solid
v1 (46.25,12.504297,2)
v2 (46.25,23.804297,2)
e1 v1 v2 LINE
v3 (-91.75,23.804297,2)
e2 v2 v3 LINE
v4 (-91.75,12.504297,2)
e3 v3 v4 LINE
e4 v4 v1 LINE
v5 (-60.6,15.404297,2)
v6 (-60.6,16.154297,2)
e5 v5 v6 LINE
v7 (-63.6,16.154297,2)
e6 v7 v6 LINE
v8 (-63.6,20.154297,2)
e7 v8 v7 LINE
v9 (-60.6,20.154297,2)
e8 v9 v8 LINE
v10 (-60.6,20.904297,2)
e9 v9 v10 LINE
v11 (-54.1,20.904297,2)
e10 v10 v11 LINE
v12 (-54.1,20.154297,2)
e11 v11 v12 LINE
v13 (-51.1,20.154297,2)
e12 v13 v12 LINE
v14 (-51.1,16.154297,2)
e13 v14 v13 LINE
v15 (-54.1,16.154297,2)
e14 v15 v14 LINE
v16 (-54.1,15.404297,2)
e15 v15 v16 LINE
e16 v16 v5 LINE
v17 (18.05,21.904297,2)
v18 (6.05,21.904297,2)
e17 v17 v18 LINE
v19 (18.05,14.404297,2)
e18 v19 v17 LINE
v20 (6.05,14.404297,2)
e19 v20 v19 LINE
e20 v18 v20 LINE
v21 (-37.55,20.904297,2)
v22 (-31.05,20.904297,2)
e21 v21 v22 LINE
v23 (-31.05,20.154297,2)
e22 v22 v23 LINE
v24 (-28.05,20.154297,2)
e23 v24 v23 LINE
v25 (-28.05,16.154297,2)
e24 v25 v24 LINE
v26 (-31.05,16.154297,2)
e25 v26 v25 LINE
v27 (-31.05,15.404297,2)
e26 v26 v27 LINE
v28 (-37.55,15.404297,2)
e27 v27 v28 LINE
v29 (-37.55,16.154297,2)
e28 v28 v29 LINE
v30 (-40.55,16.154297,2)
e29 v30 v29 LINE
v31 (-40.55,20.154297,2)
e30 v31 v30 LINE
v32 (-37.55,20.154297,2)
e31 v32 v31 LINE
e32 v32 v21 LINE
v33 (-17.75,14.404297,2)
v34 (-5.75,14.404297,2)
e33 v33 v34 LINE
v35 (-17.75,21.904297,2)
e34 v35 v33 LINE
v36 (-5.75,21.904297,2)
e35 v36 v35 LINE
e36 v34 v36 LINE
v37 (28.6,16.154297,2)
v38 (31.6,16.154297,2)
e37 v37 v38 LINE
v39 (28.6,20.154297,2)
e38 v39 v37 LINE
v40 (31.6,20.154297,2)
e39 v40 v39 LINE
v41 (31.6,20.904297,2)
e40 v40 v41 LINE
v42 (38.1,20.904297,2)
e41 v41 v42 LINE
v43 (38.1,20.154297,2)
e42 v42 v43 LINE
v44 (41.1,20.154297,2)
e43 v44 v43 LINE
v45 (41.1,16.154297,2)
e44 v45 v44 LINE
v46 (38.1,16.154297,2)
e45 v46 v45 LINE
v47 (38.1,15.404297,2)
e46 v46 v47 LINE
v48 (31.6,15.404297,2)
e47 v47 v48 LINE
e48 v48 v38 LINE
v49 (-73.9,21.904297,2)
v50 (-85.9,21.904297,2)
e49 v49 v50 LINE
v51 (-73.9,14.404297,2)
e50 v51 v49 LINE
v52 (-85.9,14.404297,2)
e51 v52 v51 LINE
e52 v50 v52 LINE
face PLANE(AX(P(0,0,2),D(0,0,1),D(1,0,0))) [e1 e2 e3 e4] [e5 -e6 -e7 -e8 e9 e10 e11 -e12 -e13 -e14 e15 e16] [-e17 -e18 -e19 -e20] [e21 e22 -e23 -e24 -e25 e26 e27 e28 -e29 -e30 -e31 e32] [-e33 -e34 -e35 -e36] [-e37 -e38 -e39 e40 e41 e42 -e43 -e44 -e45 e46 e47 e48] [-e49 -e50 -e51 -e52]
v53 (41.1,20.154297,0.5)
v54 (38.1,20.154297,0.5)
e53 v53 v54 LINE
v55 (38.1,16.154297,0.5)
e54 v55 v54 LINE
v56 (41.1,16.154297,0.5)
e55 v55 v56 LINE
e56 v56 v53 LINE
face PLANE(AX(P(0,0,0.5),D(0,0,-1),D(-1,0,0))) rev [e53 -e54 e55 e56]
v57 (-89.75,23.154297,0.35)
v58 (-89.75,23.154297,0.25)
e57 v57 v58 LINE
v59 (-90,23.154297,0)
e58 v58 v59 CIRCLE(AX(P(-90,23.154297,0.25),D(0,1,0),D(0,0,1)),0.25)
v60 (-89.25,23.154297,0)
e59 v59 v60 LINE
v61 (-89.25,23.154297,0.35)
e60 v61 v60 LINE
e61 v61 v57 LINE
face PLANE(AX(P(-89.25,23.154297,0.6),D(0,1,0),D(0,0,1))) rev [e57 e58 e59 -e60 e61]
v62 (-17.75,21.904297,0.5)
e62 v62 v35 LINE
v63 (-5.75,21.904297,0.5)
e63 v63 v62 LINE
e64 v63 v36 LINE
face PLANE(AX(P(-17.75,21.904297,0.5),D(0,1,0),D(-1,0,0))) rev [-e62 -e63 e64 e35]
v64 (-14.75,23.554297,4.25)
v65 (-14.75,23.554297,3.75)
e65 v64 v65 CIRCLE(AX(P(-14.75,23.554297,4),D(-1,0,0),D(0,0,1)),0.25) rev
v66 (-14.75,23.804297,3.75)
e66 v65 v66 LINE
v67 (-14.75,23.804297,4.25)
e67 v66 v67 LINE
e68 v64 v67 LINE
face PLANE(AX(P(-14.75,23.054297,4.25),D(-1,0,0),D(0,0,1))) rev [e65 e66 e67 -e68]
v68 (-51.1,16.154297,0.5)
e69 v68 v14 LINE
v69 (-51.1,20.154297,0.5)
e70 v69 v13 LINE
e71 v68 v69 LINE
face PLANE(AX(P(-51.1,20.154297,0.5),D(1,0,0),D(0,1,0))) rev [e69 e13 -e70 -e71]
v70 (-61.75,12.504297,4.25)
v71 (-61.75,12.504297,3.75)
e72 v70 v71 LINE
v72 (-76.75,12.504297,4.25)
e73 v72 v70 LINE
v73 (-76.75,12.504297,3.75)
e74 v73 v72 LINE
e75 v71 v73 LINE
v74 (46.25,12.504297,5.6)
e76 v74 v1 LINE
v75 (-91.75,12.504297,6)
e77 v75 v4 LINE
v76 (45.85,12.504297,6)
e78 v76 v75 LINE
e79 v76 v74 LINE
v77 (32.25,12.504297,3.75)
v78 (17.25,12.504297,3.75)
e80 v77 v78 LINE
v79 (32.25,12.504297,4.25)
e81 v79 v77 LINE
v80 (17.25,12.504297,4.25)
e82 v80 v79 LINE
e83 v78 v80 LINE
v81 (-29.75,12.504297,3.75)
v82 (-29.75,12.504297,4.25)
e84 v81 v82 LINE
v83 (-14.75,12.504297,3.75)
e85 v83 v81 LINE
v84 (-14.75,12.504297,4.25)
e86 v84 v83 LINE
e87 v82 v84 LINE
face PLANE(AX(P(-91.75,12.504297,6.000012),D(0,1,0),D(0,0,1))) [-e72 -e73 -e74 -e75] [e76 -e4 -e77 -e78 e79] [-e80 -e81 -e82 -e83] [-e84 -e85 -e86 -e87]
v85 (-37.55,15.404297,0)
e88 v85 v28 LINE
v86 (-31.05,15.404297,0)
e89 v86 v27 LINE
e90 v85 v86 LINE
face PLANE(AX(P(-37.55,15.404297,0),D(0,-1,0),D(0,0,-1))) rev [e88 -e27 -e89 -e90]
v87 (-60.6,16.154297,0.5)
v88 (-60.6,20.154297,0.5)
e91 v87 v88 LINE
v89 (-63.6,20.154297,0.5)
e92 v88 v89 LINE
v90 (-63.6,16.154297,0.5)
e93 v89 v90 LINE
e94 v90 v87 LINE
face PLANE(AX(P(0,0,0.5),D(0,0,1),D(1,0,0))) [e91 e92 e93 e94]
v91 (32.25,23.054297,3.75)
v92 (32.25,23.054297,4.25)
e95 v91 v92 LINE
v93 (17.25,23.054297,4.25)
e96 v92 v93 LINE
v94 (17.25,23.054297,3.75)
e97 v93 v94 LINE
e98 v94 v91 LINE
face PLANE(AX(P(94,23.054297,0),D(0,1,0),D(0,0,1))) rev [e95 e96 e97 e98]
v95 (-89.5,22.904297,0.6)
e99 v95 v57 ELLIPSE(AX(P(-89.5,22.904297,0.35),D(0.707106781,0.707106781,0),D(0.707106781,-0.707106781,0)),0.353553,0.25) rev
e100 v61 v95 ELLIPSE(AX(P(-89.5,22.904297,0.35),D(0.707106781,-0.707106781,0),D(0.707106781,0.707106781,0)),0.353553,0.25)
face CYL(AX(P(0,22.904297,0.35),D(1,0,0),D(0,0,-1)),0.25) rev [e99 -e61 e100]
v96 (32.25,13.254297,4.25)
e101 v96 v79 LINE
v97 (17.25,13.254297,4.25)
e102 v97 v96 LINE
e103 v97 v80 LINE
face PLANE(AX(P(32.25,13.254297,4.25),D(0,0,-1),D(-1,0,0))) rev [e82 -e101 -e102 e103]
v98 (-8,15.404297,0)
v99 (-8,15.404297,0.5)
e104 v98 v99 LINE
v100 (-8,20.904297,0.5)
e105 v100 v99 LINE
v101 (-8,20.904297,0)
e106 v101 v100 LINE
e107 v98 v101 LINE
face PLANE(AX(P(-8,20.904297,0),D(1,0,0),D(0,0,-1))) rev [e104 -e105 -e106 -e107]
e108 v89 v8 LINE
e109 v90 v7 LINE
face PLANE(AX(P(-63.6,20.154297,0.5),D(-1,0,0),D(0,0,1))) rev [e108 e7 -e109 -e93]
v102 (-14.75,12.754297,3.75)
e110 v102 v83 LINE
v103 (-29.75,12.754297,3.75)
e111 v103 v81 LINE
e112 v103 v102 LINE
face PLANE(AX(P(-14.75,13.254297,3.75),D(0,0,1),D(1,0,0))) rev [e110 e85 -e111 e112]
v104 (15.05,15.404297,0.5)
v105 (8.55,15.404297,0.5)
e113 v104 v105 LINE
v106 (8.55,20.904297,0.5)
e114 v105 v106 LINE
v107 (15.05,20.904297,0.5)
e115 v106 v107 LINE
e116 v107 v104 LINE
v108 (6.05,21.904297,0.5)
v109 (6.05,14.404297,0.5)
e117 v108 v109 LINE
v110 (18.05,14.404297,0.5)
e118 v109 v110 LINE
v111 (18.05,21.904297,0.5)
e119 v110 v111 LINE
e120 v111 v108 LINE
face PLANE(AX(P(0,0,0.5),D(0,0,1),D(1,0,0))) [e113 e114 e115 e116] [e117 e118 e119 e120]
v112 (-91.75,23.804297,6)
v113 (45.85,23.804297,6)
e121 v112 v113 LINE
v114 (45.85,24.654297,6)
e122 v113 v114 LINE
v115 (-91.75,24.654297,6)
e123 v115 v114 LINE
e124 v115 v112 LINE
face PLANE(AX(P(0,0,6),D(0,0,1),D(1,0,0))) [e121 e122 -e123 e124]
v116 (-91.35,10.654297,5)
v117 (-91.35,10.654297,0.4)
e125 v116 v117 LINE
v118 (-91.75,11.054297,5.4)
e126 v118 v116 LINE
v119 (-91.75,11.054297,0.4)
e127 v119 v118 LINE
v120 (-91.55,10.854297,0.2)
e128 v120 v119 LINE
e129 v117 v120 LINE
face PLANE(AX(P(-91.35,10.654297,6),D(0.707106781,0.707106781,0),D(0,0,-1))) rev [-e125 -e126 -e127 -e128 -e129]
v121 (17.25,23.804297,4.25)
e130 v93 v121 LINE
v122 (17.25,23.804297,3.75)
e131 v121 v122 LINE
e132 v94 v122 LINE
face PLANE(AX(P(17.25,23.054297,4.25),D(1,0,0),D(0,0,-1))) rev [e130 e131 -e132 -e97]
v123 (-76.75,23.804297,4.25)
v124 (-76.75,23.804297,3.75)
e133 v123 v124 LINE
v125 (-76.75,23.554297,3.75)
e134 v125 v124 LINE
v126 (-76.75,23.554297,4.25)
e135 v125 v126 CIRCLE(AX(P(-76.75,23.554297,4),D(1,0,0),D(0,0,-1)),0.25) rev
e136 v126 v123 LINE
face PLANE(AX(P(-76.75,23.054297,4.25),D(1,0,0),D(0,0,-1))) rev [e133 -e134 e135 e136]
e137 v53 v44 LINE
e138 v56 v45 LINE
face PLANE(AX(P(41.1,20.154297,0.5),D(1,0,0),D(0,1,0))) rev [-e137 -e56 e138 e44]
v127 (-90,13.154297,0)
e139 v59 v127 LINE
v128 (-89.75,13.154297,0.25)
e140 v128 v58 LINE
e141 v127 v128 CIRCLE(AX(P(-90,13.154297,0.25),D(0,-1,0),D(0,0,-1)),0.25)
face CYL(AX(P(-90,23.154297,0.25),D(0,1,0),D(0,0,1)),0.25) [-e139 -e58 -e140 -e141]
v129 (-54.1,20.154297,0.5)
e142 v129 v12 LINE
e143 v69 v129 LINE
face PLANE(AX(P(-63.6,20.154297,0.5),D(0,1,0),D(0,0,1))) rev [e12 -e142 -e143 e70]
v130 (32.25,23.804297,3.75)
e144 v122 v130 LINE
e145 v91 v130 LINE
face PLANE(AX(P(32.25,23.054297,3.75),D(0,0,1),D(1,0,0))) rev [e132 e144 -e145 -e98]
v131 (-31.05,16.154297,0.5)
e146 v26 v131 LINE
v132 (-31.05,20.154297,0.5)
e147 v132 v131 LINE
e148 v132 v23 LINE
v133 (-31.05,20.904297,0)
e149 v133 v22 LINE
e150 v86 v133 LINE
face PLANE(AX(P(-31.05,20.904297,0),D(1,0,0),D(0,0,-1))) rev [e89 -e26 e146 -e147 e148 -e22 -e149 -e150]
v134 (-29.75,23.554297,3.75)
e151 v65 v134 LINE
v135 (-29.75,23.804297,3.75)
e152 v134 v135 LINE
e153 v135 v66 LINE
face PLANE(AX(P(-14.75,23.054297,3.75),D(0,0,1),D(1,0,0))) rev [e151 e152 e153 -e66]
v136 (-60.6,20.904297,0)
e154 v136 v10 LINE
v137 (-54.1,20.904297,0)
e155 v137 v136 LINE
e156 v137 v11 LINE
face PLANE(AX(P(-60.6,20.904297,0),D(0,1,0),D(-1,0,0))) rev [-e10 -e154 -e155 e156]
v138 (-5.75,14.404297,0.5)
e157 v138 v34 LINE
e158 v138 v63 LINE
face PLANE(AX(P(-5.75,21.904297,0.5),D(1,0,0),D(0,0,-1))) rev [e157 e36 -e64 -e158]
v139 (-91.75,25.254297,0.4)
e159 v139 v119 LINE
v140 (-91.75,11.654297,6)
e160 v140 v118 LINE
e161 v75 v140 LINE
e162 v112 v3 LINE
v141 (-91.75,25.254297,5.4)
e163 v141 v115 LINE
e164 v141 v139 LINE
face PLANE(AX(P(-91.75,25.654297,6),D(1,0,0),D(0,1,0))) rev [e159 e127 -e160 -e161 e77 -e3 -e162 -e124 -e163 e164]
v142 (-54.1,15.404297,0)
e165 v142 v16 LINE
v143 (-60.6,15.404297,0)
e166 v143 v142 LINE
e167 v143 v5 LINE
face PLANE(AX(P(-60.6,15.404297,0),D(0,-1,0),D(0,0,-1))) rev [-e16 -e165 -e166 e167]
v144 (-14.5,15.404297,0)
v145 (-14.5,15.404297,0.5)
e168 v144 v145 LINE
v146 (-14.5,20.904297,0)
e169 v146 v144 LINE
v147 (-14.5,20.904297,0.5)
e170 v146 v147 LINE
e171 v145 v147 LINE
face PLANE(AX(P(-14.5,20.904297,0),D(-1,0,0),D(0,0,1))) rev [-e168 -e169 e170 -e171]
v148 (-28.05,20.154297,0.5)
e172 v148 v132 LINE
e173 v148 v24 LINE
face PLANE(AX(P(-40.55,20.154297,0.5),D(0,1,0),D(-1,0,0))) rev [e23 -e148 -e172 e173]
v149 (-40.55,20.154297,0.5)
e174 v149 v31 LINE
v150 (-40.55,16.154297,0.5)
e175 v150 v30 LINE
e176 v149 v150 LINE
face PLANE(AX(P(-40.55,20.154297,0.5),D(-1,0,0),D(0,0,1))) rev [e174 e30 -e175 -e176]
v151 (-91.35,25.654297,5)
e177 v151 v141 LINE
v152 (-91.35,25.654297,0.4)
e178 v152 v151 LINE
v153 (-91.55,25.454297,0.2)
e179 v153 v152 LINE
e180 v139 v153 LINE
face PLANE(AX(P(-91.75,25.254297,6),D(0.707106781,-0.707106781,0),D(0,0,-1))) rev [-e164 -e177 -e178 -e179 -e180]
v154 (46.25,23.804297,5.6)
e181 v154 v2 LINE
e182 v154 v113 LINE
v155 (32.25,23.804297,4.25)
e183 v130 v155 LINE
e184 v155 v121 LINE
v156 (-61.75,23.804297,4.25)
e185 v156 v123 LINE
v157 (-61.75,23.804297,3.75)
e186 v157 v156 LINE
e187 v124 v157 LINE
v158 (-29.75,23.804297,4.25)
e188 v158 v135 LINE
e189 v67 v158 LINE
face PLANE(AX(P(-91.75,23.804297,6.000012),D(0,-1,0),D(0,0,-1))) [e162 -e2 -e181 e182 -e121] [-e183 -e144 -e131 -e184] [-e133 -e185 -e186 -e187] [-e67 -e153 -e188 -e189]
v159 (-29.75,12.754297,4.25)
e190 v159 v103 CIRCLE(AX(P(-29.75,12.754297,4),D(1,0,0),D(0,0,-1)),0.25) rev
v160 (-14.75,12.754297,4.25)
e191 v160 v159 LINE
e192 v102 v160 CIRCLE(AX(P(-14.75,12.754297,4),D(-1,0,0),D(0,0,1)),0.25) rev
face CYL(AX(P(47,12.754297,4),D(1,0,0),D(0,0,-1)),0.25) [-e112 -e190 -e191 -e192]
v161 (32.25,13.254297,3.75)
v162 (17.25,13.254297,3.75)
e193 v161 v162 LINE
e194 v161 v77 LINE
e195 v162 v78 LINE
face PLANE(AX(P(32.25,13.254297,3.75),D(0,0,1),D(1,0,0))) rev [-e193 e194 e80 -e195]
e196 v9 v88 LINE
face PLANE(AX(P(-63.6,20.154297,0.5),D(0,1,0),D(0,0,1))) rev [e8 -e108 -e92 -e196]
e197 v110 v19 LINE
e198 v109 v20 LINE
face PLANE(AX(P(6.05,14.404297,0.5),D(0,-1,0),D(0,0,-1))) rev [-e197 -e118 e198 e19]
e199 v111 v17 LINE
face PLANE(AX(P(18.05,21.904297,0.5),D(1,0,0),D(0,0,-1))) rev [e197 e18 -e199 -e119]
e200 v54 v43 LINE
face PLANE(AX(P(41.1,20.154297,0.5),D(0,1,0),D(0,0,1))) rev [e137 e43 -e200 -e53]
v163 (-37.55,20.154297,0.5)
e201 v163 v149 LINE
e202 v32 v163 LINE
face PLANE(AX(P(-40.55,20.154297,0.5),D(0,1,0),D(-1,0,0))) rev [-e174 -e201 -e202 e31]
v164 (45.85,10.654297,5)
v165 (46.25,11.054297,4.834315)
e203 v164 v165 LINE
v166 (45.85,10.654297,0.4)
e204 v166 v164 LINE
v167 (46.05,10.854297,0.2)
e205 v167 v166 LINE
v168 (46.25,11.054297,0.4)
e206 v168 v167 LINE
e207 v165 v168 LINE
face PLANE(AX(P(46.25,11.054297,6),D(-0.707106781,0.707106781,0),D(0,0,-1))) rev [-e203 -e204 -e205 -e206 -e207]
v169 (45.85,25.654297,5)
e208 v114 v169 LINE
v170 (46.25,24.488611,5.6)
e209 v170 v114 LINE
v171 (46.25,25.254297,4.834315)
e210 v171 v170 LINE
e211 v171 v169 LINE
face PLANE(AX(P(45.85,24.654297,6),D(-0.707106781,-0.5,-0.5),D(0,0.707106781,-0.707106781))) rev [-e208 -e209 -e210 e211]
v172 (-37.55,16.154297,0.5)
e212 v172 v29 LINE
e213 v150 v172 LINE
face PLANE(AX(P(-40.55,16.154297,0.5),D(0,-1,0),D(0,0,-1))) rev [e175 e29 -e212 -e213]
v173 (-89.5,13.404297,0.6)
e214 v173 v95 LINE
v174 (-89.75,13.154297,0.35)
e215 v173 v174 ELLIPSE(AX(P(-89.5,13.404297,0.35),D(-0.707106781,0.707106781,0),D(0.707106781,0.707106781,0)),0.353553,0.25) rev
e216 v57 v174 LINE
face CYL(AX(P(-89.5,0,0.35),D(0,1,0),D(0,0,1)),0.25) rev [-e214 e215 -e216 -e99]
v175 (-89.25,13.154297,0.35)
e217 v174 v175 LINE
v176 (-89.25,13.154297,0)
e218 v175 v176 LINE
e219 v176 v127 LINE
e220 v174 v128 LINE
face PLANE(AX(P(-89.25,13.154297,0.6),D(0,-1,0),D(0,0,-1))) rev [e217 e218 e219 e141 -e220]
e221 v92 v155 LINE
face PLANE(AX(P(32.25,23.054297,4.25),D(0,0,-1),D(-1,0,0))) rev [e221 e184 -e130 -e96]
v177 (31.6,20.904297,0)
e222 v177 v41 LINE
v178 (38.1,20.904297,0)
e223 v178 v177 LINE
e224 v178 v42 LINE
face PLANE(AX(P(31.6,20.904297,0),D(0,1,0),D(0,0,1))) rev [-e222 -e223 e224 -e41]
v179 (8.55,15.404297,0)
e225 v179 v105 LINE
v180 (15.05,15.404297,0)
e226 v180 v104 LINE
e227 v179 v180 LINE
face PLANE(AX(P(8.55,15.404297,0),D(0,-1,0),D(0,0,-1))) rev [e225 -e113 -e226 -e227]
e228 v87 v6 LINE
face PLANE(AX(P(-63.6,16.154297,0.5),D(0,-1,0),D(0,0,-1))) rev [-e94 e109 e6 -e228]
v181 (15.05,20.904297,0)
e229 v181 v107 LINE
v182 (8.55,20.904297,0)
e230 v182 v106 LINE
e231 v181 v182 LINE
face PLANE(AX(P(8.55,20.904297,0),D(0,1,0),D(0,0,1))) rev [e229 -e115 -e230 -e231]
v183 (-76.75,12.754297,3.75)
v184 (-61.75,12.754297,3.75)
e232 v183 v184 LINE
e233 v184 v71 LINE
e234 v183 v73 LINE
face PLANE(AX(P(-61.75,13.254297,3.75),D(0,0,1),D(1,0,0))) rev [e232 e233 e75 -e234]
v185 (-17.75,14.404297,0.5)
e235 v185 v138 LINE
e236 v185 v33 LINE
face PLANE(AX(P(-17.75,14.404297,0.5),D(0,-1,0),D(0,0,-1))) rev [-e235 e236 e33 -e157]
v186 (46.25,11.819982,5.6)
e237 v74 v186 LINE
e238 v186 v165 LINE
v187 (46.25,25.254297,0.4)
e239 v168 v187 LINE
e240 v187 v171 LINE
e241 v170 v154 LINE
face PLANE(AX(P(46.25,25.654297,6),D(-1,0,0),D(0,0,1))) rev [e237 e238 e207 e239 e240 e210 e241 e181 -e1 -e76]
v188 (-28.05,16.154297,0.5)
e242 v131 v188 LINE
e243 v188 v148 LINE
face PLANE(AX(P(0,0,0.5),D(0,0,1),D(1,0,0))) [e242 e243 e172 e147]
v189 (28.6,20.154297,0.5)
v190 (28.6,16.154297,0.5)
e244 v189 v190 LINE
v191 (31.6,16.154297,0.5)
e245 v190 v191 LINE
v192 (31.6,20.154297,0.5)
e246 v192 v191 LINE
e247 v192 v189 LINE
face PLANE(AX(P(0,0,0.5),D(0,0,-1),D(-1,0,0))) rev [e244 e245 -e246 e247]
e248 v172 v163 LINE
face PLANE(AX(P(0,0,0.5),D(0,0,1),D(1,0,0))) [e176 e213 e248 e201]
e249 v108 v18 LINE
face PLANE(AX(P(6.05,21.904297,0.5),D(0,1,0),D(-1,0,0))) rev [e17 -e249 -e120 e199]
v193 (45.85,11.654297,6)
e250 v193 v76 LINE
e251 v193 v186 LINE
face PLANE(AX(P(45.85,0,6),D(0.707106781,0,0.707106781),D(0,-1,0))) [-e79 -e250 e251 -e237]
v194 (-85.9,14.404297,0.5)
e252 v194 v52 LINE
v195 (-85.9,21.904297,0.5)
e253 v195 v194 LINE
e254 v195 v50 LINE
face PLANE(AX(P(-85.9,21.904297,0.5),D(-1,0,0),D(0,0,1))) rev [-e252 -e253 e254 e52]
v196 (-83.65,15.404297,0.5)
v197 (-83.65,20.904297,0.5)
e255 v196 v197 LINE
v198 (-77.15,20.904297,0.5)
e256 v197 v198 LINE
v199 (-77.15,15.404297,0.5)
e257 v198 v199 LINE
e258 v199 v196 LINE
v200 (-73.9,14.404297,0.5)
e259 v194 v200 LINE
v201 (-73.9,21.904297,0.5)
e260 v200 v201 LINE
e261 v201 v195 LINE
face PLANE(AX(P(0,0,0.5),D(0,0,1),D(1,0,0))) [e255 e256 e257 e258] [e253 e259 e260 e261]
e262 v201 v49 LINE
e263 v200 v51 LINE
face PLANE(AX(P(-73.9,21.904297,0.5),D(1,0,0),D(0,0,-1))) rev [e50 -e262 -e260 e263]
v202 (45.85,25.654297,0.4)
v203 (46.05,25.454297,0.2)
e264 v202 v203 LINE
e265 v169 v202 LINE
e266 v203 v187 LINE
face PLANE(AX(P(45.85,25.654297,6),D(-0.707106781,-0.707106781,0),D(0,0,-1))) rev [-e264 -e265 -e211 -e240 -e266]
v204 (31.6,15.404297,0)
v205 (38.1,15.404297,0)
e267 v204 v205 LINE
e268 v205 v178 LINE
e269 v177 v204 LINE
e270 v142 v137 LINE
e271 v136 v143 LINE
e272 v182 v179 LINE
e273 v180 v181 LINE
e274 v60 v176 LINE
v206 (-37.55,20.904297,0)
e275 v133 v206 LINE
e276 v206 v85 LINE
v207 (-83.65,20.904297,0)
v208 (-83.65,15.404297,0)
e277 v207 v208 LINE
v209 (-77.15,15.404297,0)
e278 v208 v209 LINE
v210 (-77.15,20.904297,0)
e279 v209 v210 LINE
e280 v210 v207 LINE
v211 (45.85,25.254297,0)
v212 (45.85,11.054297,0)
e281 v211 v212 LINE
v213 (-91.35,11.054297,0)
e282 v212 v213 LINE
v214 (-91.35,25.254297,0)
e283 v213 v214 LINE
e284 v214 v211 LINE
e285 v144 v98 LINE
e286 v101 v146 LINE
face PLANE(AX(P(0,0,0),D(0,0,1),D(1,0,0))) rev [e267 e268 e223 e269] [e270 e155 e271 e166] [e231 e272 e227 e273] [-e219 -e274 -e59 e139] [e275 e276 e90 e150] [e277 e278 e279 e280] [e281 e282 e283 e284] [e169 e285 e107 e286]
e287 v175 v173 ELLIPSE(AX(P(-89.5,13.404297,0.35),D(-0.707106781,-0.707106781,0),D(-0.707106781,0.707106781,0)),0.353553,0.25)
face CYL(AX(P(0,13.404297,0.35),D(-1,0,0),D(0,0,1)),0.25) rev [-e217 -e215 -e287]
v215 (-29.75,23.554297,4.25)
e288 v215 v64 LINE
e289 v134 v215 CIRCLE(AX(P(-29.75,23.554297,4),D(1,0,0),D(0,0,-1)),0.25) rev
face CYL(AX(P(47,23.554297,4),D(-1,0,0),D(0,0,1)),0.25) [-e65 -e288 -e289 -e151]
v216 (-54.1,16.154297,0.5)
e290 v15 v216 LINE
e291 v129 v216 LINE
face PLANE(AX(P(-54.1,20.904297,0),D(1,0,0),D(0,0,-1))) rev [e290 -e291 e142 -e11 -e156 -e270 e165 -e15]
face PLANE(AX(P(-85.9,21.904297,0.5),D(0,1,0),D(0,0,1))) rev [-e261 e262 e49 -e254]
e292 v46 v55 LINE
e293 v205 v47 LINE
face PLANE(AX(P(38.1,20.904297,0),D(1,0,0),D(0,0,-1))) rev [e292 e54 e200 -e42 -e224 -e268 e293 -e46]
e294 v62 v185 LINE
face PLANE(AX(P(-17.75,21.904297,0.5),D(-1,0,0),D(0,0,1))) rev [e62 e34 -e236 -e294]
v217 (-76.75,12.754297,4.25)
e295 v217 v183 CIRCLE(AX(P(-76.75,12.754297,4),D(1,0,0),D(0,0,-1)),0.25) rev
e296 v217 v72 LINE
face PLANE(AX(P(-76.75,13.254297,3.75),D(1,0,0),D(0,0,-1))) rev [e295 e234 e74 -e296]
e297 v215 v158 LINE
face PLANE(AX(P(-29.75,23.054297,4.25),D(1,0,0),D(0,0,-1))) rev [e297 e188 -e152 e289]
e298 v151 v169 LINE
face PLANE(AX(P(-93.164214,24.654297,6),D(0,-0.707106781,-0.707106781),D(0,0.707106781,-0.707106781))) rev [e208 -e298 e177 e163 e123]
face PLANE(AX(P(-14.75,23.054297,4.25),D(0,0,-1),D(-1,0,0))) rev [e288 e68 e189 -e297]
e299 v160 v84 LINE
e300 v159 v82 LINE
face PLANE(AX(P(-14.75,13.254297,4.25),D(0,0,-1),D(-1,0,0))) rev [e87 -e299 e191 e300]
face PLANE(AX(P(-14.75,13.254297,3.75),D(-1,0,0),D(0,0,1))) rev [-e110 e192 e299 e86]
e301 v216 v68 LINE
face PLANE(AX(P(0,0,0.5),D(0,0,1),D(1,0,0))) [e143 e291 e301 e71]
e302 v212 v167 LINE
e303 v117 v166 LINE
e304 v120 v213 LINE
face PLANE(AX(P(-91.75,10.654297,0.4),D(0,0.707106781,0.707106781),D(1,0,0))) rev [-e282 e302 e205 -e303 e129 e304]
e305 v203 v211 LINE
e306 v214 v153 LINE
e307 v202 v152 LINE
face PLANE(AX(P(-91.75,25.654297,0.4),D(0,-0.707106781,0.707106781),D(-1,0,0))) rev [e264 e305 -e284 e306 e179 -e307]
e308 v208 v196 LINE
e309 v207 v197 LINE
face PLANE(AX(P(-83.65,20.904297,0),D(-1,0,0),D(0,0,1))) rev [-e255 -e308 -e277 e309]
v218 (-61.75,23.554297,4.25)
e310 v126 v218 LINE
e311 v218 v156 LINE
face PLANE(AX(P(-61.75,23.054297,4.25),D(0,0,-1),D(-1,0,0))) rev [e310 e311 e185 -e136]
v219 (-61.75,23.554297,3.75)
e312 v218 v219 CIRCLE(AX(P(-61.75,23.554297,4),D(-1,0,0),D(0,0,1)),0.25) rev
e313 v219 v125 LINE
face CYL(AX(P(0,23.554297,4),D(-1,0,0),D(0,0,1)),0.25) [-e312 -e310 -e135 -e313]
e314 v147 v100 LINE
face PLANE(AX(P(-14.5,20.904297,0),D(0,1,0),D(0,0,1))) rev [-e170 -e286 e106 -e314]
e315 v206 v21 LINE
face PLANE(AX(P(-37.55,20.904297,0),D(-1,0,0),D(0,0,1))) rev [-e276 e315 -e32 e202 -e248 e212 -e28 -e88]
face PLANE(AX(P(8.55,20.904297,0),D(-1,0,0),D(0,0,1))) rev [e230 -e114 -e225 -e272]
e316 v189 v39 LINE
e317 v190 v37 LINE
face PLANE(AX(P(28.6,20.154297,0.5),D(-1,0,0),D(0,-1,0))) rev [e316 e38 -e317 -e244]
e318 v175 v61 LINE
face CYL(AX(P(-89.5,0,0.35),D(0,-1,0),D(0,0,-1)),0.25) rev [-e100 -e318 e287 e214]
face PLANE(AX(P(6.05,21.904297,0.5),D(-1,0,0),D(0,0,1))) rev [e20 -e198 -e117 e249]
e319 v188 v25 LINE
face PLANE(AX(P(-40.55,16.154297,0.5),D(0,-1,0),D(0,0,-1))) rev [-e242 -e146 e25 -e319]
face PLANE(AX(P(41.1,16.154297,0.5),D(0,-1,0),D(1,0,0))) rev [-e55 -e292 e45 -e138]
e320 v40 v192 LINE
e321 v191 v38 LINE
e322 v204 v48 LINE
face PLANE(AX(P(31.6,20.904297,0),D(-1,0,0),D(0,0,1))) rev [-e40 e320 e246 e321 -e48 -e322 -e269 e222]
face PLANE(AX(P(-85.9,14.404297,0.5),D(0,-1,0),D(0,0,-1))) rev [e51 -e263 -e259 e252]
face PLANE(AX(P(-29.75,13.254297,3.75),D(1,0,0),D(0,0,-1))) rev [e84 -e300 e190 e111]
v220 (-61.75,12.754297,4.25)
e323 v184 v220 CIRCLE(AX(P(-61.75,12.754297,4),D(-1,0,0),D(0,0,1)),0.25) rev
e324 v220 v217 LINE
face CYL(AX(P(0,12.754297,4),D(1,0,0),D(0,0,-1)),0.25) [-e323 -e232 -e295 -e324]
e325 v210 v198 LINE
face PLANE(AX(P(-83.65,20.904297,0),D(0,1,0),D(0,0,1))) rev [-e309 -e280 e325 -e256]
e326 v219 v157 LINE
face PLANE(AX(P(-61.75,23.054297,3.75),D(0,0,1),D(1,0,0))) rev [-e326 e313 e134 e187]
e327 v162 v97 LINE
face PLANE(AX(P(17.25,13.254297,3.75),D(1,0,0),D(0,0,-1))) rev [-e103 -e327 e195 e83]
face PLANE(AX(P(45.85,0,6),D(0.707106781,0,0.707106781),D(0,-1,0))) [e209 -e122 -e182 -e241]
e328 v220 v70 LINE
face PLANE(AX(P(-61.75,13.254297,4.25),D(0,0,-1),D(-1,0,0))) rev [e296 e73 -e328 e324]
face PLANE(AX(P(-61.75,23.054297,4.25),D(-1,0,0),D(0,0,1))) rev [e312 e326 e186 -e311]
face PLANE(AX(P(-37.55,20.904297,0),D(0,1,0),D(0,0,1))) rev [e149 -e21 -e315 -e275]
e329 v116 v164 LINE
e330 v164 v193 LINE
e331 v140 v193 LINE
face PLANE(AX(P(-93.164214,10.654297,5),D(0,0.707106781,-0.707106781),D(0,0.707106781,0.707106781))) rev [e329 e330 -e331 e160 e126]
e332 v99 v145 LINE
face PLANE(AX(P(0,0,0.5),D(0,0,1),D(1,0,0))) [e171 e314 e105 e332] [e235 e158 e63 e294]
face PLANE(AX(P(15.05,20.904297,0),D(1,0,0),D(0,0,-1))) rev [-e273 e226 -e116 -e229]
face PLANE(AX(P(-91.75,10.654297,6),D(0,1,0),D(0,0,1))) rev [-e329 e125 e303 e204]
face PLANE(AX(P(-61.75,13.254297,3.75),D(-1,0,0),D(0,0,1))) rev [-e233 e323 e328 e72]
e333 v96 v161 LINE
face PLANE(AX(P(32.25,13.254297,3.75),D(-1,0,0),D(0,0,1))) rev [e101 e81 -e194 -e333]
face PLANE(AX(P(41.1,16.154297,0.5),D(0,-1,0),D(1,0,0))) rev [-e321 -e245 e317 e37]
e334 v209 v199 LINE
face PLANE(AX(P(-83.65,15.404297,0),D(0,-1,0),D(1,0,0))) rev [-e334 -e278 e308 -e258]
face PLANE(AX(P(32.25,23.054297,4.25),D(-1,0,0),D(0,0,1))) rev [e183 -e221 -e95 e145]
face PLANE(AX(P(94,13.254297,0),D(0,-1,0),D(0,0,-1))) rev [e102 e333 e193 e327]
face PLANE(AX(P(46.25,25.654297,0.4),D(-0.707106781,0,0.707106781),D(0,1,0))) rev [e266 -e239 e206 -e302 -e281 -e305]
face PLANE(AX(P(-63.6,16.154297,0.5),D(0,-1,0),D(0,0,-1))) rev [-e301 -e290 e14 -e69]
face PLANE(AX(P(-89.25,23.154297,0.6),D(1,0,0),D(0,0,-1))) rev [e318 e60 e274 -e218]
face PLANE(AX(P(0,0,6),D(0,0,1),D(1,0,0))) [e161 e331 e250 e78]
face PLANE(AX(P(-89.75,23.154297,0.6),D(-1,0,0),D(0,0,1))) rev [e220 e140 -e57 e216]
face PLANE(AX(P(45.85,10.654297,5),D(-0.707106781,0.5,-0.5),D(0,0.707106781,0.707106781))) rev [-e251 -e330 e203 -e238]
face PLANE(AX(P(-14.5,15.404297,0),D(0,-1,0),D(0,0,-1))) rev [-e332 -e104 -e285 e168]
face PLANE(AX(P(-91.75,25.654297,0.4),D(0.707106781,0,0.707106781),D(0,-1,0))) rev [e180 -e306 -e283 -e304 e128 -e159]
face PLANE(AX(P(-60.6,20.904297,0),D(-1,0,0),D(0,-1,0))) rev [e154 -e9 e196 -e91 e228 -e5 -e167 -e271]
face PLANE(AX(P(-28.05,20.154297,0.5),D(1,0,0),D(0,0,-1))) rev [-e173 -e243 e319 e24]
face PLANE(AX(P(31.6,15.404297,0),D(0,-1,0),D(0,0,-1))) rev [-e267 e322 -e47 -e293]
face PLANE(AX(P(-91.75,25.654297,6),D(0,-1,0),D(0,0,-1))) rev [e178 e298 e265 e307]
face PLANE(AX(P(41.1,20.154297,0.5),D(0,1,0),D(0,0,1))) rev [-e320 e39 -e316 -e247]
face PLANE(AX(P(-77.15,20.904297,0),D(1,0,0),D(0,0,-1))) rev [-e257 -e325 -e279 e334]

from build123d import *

# Parameters (mm, degrees)
SKETCH1_W               = 138
SKETCH1_H               = 15
BOSS_EXTRUDE1_DEPTH     = 6
CUT_EXTRUDE1_DEPTH      = 96.457872636
CUT_EXTRUDE1_DEPTH_BACK = 96.457872636
SKETCH2_W               = 6.5
SKETCH2_H               = 5.5
CUT_EXTRUDE2_DEPTH      = 96.457872636
CUT_EXTRUDE2_DEPTH_BACK = 96.457872636
SKETCH3_W               = 6.5
SKETCH3_H               = 5.5
CUT_EXTRUDE3_DEPTH      = 96.457872636
CUT_EXTRUDE3_DEPTH_BACK = 96.457872636
SKETCH4_W               = 6.5
SKETCH4_H               = 5.5
CUT_EXTRUDE4_DEPTH      = 96.457872636
CUT_EXTRUDE4_DEPTH_BACK = 96.457872636
SKETCH5_W               = 6.5
SKETCH5_H               = 5.5
CUT_EXTRUDE5_DEPTH      = 96.457872636
CUT_EXTRUDE5_DEPTH_BACK = 4
SKETCH8_W               = 138
SKETCH8_H               = 11.3
SKETCH9_W               = 12
SKETCH9_H               = 7.5
SKETCH9_W_2             = 12.5
SKETCH9_H_2             = 4
CUT_EXTRUDE6_DEPTH      = 1.5
SKETCH10_W              = 12.5
SKETCH10_H              = 4
CUT_EXTRUDE7_DEPTH      = 1.5
CUT_EXTRUDE8_DEPTH      = 138
SKETCH13_W              = 0.5
SKETCH13_H              = 10
CUT_EXTRUDE9_DEPTH      = 0.6
FILLET1_R               = 0.25
FILLET2_R               = 0.25
SKETCH16_W              = 15
SKETCH16_H              = 0.5
BOSS_EXTRUDE2_DEPTH     = 0.75
FILLET3_R               = 0.5
FILLET4_R               = 0.25
SKETCH17_W              = 15
SKETCH17_H              = 0.5
BOSS_EXTRUDE3_DEPTH     = 0.75
FILLET5_R               = 0.5
FILLET6_R               = 0.25
LPATTERN1_COUNT         = 3
LPATTERN1_PITCH         = 47
LPATTERN2_COUNT         = 3
LPATTERN2_PITCH         = 47
FILLET7_R               = 0.5
FILLET8_R               = 0.25
FILLET9_R               = 0.5
FILLET10_R              = 0.25
CHAMFER1_SIZE           = 0.4
CHAMFER2_SIZE           = 0.4
CHAMFER3_SIZE           = 0.4
CHAMFER5_SIZE           = 0.4


# Some blends are built 0.0001 mm under size
with BuildPart() as part:
    # Sketch1 → Boss-Extrude1 (new body)
    with BuildSketch(Plane.XY):
        with Locations((-22.75, 18.154296875)):
            Rectangle(SKETCH1_W, SKETCH1_H)
    extrude(amount=BOSS_EXTRUDE1_DEPTH)

    # Sketch2 → Cut-Extrude1 (cut, two sides: drawn at the far end of the back side and taken through both)
    with BuildSketch(Plane.XY.offset(6).offset(-CUT_EXTRUDE1_DEPTH_BACK)):
        with Locations((-80.4, 18.154296875)):
            Rectangle(SKETCH2_W, SKETCH2_H)
    extrude(amount=CUT_EXTRUDE1_DEPTH + CUT_EXTRUDE1_DEPTH_BACK, mode=Mode.SUBTRACT)

    # Sketch3 → Cut-Extrude2 (cut, two sides: drawn at the far end of the back side and taken through both)
    with BuildSketch(Plane.XY.offset(6).offset(-CUT_EXTRUDE2_DEPTH_BACK)):
        with Locations((-57.35, 18.154296875)):
            Rectangle(SKETCH3_W, SKETCH3_H)
    extrude(amount=CUT_EXTRUDE2_DEPTH + CUT_EXTRUDE2_DEPTH_BACK, mode=Mode.SUBTRACT)

    # Sketch4 → Cut-Extrude3 (cut, two sides: drawn at the far end of the back side and taken through both)
    with BuildSketch(Plane.XY.offset(6).offset(-CUT_EXTRUDE3_DEPTH_BACK)):
        with Locations((-34.3, 18.154296875)):
            Rectangle(SKETCH4_W, SKETCH4_H)
    extrude(amount=CUT_EXTRUDE3_DEPTH + CUT_EXTRUDE3_DEPTH_BACK, mode=Mode.SUBTRACT)

    # Sketch5 → Cut-Extrude4 (cut, two sides: drawn at the far end of the back side and taken through both)
    with BuildSketch(Plane.XY.offset(6).offset(-CUT_EXTRUDE4_DEPTH_BACK)):
        with Locations((-11.25, 18.154296875)):
            Rectangle(SKETCH5_W, SKETCH5_H)
        with Locations((11.8, 18.154296875)):
            Rectangle(SKETCH5_W, SKETCH5_H)
        with Locations((34.85, 18.154296875)):
            Rectangle(SKETCH5_W, SKETCH5_H)
    extrude(amount=CUT_EXTRUDE4_DEPTH + CUT_EXTRUDE4_DEPTH_BACK, mode=Mode.SUBTRACT)

    # Sketch8 → Cut-Extrude5 (cut, two sides: drawn at the far end of the back side and taken through both)
    with BuildSketch(Plane.XY.offset(6).offset(-CUT_EXTRUDE5_DEPTH_BACK)):
        with Locations((-22.75, 18.154296875)):
            Rectangle(SKETCH8_W, SKETCH8_H)
    extrude(amount=CUT_EXTRUDE5_DEPTH + CUT_EXTRUDE5_DEPTH_BACK, mode=Mode.SUBTRACT)

    # Sketch9 → Cut-Extrude6 (cut)
    with BuildSketch(Plane.XY.offset(2)):
        with Locations((-11.75, 18.154296875)):
            Rectangle(SKETCH9_W, SKETCH9_H)
        with Locations((12.05, 18.154296875)):
            Rectangle(SKETCH9_W, SKETCH9_H)
        with Locations((-79.9, 18.154296875)):
            Rectangle(SKETCH9_W, SKETCH9_H)
        with Locations((34.85, 18.154296875)):
            Rectangle(SKETCH9_W_2, SKETCH9_H_2)
    extrude(amount=-CUT_EXTRUDE6_DEPTH, mode=Mode.SUBTRACT)

    # Sketch10 → Cut-Extrude7 (cut)
    with BuildSketch(Plane.XY.offset(2)):
        with Locations((-34.3, 18.154296875)):
            Rectangle(SKETCH10_W, SKETCH10_H)
        with Locations((-57.35, 18.154296875)):
            Rectangle(SKETCH10_W, SKETCH10_H)
    extrude(amount=-CUT_EXTRUDE7_DEPTH, mode=Mode.SUBTRACT)

    # Sketch12 → Cut-Extrude8 (cut)
    with BuildSketch(Plane(origin=(46.25, 0, 0), x_dir=(0, 0, -1), z_dir=(1, 0, 0))):
        Polygon((-6, 25.654296875), (-6, 24.654296875), (-5, 25.654296875), align=None)
        Polygon((-6, 10.654296875), (-5, 10.654296875), (-6, 11.654296875), align=None)
    extrude(amount=-CUT_EXTRUDE8_DEPTH, mode=Mode.SUBTRACT)

    # Sketch13 → Cut-Extrude9 (cut)
    with BuildSketch(Plane(origin=(0, 0, 0), x_dir=(-1, 0, 0), z_dir=(0, 0, -1))):
        with Locations((89.5, 18.154296875)):
            Rectangle(SKETCH13_W, SKETCH13_H)
    extrude(amount=-CUT_EXTRUDE9_DEPTH, mode=Mode.SUBTRACT)

    # Fillet1
    fillet1_edges = [part.edges().sort_by_distance(p)[0] for p in [
        (-89.75, 18.154296875, 0),
    ]]
    fillet(fillet1_edges, radius=FILLET1_R)

    # Fillet2
    fillet2_edges = [part.edges().sort_by_distance(p)[0] for p in [
        (-89.25, 18.154296875, 0.6),
        (-89.5, 23.154296875, 0.6),
        (-89.75, 18.154296875, 0.6),
        (-89.5, 13.154296875, 0.6),
    ]]
    fillet(fillet2_edges, radius=FILLET2_R - 0.0001)  # a hair under: the kernel refuses the full size

    # Sketch16 → Boss-Extrude2 (add)
    with BuildSketch(Plane.XZ.offset(-23.804296875)):
        with Locations((-69.25, 4)):
            Rectangle(SKETCH16_W, SKETCH16_H)
    boss_extrude2 = extrude(amount=BOSS_EXTRUDE2_DEPTH)

    # Fillet3
    fillet3_edges = [part.edges().sort_by_distance(p)[0] for p in [
        (-69.25, 23.054296875, 4.25),
    ]]
    fillet(fillet3_edges, radius=FILLET3_R - 0.0001)  # a hair under: the kernel refuses the full size

    # Fillet4
    # the kernel refuses this fillet: 0.25 mm, written as the material it takes off along each edge
    with BuildSketch(Plane(origin=(-78.517583771, 23.054296875, 3.75), x_dir=(0, 0.7070334963750315, 0.7071800584035852), z_dir=(1, 0, 0))) as fillet4_piece_1:
        with BuildLine():
            CenterArc((0.530239778, -0.176759656), FILLET4_R, 44.994477546, 179.999584605)
            Line((0.353444764, -0.35351803), (0.335765262, -0.371193867))
            Line((0.335765262, -0.371193867), (-0.017679501, -0.017675837))
            Line((-0.017679501, -0.017675837), (-0.017675837, 0.017679501))
            ThreePointArc((-0.017675837, 0.017679501), (-0.017605119, 0.017750205), (0.724712885, 0.017675966))
            Line((0.724712885, 0.017675966), (0.707033512, 0))
        make_face()
    extrude(amount=18.535167542, mode=Mode.SUBTRACT)

    # Sketch17 → Boss-Extrude3 (add)
    with BuildSketch(Plane(origin=(0, 12.504296875, 0), x_dir=(1, 0, 0), z_dir=(0, 1, 0))):
        with Locations((-69.25, -4)):
            Rectangle(SKETCH17_W, SKETCH17_H)
    boss_extrude3 = extrude(amount=BOSS_EXTRUDE3_DEPTH)

    # Fillet5
    fillet5_edges = [part.edges().sort_by_distance(p)[0] for p in [
        (-69.25, 13.254296875, 4.25),
    ]]
    fillet(fillet5_edges, radius=FILLET5_R - 0.0001)  # a hair under: the kernel refuses the full size

    # Fillet6
    # the kernel refuses this fillet: 0.25 mm, written as the material it takes off along each edge
    with BuildSketch(Plane(origin=(-59.982416237, 13.254296875, 3.75), x_dir=(0, -0.707033490014658, 0.7071800647626406), z_dir=(-1, 0, 0))) as fillet6_piece_1:
        with BuildLine():
            CenterArc((0.530239774, -0.176759657), FILLET6_R, 44.994478062, 179.999583575)
            Line((0.353444757, -0.35351803), (0.335765256, -0.371193867))
            Line((0.335765256, -0.371193867), (-0.017679502, -0.017675837))
            Line((-0.017679502, -0.017675837), (-0.017675837, 0.017679502))
            ThreePointArc((-0.017675837, 0.017679502), (-0.017605119, 0.017750205), (0.724712878, 0.017675966))
            Line((0.724712878, 0.017675966), (0.707033505, 0))
        make_face()
    extrude(amount=18.535167526, mode=Mode.SUBTRACT)

    # LPattern1: Boss-Extrude3 ×3
    with Locations(*[(i * LPATTERN1_PITCH, 0, 0) for i in range(1, LPATTERN1_COUNT)]):
        add(boss_extrude3)

    # LPattern2: Boss-Extrude2 ×3
    with Locations(*[(i * LPATTERN2_PITCH, 0, 0) for i in range(1, LPATTERN2_COUNT)]):
        add(boss_extrude2)

    # Fillet7
    fillet7_edges = [part.edges().sort_by_distance(p)[0] for p in [
        (-22.25, 23.054296875, 4.25),
    ]]
    fillet(fillet7_edges, radius=FILLET7_R - 0.0001)  # a hair under: the kernel refuses the full size

    # Fillet8
    # the kernel refuses this fillet: 0.25 mm, written as the material it takes off along each edge
    with BuildSketch(Plane(origin=(-31.517583771, 23.054296875, 3.75), x_dir=(0, 0.7070334900866685, 0.707180064690645), z_dir=(1, 0, 0))) as fillet8_piece_1:
        with BuildLine():
            CenterArc((0.530239774, -0.176759657), FILLET8_R, 44.994478056, 179.999583586)
            Line((0.353444758, -0.35351803), (0.335765256, -0.371193867))
            Line((0.335765256, -0.371193867), (-0.017679502, -0.017675837))
            Line((-0.017679502, -0.017675837), (-0.017675837, 0.017679502))
            ThreePointArc((-0.017675837, 0.017679502), (-0.017605119, 0.017750205), (0.724712878, 0.017675966))
            Line((0.724712878, 0.017675966), (0.707033505, 0))
        make_face()
    extrude(amount=18.535167542, mode=Mode.SUBTRACT)

    # Fillet9
    fillet9_edges = [part.edges().sort_by_distance(p)[0] for p in [
        (-22.25, 13.254296875, 4.25),
    ]]
    fillet(fillet9_edges, radius=FILLET9_R - 0.0001)  # a hair under: the kernel refuses the full size

    # Fillet10
    # the kernel refuses this fillet: 0.25 mm, written as the material it takes off along each edge
    with BuildSketch(Plane(origin=(-12.982416233, 13.254296875, 3.75), x_dir=(0, -0.7070334900159922, 0.7071800647613065), z_dir=(-1, 0, 0))) as fillet10_piece_1:
        with BuildLine():
            CenterArc((0.530239774, -0.176759657), FILLET10_R, 44.994478062, 179.999583575)
            Line((0.353444757, -0.35351803), (0.335765256, -0.371193867))
            Line((0.335765256, -0.371193867), (-0.017679502, -0.017675837))
            Line((-0.017679502, -0.017675837), (-0.017675837, 0.017679502))
            ThreePointArc((-0.017675837, 0.017679502), (-0.017605119, 0.017750205), (0.724712878, 0.017675966))
            Line((0.724712878, 0.017675966), (0.707033505, 0))
        make_face()
    extrude(amount=18.535167534, mode=Mode.SUBTRACT)

    # Chamfer1
    chamfer1_edges = [part.edges().sort_by_distance(p)[0] for p in [
        (-22.75, 25.654296875, 0),
        (-22.75, 10.654296875, 0),
    ]]
    chamfer(chamfer1_edges, length=CHAMFER1_SIZE)

    # Chamfer2
    chamfer2_edges = [part.edges().sort_by_distance(p)[0] for p in [
        (46.25, 18.154296875, 0),
        (-91.75, 18.154296875, 0),
    ]]
    chamfer(chamfer2_edges, length=CHAMFER2_SIZE)

    # Chamfer3
    chamfer3_edges = [part.edges().sort_by_distance(p)[0] for p in [
        (-91.75, 25.654296875, 2.7),
        (-91.75, 10.654296875, 2.7),
    ]]
    chamfer(chamfer3_edges, length=CHAMFER3_SIZE)

    # Chamfer5
    chamfer5_edges = [part.edges().sort_by_distance(p)[0] for p in [
        (46.25, 24.229296875, 6),
        (46.25, 25.654296875, 2.7),
        (46.25, 10.654296875, 2.7),
        (46.25, 12.079296875, 6),
        (46.25, 25.154296875, 5.5),
        (46.25, 11.154296875, 5.5),
    ]]
    chamfer(chamfer5_edges, length=CHAMFER5_SIZE)


solid = part.part
